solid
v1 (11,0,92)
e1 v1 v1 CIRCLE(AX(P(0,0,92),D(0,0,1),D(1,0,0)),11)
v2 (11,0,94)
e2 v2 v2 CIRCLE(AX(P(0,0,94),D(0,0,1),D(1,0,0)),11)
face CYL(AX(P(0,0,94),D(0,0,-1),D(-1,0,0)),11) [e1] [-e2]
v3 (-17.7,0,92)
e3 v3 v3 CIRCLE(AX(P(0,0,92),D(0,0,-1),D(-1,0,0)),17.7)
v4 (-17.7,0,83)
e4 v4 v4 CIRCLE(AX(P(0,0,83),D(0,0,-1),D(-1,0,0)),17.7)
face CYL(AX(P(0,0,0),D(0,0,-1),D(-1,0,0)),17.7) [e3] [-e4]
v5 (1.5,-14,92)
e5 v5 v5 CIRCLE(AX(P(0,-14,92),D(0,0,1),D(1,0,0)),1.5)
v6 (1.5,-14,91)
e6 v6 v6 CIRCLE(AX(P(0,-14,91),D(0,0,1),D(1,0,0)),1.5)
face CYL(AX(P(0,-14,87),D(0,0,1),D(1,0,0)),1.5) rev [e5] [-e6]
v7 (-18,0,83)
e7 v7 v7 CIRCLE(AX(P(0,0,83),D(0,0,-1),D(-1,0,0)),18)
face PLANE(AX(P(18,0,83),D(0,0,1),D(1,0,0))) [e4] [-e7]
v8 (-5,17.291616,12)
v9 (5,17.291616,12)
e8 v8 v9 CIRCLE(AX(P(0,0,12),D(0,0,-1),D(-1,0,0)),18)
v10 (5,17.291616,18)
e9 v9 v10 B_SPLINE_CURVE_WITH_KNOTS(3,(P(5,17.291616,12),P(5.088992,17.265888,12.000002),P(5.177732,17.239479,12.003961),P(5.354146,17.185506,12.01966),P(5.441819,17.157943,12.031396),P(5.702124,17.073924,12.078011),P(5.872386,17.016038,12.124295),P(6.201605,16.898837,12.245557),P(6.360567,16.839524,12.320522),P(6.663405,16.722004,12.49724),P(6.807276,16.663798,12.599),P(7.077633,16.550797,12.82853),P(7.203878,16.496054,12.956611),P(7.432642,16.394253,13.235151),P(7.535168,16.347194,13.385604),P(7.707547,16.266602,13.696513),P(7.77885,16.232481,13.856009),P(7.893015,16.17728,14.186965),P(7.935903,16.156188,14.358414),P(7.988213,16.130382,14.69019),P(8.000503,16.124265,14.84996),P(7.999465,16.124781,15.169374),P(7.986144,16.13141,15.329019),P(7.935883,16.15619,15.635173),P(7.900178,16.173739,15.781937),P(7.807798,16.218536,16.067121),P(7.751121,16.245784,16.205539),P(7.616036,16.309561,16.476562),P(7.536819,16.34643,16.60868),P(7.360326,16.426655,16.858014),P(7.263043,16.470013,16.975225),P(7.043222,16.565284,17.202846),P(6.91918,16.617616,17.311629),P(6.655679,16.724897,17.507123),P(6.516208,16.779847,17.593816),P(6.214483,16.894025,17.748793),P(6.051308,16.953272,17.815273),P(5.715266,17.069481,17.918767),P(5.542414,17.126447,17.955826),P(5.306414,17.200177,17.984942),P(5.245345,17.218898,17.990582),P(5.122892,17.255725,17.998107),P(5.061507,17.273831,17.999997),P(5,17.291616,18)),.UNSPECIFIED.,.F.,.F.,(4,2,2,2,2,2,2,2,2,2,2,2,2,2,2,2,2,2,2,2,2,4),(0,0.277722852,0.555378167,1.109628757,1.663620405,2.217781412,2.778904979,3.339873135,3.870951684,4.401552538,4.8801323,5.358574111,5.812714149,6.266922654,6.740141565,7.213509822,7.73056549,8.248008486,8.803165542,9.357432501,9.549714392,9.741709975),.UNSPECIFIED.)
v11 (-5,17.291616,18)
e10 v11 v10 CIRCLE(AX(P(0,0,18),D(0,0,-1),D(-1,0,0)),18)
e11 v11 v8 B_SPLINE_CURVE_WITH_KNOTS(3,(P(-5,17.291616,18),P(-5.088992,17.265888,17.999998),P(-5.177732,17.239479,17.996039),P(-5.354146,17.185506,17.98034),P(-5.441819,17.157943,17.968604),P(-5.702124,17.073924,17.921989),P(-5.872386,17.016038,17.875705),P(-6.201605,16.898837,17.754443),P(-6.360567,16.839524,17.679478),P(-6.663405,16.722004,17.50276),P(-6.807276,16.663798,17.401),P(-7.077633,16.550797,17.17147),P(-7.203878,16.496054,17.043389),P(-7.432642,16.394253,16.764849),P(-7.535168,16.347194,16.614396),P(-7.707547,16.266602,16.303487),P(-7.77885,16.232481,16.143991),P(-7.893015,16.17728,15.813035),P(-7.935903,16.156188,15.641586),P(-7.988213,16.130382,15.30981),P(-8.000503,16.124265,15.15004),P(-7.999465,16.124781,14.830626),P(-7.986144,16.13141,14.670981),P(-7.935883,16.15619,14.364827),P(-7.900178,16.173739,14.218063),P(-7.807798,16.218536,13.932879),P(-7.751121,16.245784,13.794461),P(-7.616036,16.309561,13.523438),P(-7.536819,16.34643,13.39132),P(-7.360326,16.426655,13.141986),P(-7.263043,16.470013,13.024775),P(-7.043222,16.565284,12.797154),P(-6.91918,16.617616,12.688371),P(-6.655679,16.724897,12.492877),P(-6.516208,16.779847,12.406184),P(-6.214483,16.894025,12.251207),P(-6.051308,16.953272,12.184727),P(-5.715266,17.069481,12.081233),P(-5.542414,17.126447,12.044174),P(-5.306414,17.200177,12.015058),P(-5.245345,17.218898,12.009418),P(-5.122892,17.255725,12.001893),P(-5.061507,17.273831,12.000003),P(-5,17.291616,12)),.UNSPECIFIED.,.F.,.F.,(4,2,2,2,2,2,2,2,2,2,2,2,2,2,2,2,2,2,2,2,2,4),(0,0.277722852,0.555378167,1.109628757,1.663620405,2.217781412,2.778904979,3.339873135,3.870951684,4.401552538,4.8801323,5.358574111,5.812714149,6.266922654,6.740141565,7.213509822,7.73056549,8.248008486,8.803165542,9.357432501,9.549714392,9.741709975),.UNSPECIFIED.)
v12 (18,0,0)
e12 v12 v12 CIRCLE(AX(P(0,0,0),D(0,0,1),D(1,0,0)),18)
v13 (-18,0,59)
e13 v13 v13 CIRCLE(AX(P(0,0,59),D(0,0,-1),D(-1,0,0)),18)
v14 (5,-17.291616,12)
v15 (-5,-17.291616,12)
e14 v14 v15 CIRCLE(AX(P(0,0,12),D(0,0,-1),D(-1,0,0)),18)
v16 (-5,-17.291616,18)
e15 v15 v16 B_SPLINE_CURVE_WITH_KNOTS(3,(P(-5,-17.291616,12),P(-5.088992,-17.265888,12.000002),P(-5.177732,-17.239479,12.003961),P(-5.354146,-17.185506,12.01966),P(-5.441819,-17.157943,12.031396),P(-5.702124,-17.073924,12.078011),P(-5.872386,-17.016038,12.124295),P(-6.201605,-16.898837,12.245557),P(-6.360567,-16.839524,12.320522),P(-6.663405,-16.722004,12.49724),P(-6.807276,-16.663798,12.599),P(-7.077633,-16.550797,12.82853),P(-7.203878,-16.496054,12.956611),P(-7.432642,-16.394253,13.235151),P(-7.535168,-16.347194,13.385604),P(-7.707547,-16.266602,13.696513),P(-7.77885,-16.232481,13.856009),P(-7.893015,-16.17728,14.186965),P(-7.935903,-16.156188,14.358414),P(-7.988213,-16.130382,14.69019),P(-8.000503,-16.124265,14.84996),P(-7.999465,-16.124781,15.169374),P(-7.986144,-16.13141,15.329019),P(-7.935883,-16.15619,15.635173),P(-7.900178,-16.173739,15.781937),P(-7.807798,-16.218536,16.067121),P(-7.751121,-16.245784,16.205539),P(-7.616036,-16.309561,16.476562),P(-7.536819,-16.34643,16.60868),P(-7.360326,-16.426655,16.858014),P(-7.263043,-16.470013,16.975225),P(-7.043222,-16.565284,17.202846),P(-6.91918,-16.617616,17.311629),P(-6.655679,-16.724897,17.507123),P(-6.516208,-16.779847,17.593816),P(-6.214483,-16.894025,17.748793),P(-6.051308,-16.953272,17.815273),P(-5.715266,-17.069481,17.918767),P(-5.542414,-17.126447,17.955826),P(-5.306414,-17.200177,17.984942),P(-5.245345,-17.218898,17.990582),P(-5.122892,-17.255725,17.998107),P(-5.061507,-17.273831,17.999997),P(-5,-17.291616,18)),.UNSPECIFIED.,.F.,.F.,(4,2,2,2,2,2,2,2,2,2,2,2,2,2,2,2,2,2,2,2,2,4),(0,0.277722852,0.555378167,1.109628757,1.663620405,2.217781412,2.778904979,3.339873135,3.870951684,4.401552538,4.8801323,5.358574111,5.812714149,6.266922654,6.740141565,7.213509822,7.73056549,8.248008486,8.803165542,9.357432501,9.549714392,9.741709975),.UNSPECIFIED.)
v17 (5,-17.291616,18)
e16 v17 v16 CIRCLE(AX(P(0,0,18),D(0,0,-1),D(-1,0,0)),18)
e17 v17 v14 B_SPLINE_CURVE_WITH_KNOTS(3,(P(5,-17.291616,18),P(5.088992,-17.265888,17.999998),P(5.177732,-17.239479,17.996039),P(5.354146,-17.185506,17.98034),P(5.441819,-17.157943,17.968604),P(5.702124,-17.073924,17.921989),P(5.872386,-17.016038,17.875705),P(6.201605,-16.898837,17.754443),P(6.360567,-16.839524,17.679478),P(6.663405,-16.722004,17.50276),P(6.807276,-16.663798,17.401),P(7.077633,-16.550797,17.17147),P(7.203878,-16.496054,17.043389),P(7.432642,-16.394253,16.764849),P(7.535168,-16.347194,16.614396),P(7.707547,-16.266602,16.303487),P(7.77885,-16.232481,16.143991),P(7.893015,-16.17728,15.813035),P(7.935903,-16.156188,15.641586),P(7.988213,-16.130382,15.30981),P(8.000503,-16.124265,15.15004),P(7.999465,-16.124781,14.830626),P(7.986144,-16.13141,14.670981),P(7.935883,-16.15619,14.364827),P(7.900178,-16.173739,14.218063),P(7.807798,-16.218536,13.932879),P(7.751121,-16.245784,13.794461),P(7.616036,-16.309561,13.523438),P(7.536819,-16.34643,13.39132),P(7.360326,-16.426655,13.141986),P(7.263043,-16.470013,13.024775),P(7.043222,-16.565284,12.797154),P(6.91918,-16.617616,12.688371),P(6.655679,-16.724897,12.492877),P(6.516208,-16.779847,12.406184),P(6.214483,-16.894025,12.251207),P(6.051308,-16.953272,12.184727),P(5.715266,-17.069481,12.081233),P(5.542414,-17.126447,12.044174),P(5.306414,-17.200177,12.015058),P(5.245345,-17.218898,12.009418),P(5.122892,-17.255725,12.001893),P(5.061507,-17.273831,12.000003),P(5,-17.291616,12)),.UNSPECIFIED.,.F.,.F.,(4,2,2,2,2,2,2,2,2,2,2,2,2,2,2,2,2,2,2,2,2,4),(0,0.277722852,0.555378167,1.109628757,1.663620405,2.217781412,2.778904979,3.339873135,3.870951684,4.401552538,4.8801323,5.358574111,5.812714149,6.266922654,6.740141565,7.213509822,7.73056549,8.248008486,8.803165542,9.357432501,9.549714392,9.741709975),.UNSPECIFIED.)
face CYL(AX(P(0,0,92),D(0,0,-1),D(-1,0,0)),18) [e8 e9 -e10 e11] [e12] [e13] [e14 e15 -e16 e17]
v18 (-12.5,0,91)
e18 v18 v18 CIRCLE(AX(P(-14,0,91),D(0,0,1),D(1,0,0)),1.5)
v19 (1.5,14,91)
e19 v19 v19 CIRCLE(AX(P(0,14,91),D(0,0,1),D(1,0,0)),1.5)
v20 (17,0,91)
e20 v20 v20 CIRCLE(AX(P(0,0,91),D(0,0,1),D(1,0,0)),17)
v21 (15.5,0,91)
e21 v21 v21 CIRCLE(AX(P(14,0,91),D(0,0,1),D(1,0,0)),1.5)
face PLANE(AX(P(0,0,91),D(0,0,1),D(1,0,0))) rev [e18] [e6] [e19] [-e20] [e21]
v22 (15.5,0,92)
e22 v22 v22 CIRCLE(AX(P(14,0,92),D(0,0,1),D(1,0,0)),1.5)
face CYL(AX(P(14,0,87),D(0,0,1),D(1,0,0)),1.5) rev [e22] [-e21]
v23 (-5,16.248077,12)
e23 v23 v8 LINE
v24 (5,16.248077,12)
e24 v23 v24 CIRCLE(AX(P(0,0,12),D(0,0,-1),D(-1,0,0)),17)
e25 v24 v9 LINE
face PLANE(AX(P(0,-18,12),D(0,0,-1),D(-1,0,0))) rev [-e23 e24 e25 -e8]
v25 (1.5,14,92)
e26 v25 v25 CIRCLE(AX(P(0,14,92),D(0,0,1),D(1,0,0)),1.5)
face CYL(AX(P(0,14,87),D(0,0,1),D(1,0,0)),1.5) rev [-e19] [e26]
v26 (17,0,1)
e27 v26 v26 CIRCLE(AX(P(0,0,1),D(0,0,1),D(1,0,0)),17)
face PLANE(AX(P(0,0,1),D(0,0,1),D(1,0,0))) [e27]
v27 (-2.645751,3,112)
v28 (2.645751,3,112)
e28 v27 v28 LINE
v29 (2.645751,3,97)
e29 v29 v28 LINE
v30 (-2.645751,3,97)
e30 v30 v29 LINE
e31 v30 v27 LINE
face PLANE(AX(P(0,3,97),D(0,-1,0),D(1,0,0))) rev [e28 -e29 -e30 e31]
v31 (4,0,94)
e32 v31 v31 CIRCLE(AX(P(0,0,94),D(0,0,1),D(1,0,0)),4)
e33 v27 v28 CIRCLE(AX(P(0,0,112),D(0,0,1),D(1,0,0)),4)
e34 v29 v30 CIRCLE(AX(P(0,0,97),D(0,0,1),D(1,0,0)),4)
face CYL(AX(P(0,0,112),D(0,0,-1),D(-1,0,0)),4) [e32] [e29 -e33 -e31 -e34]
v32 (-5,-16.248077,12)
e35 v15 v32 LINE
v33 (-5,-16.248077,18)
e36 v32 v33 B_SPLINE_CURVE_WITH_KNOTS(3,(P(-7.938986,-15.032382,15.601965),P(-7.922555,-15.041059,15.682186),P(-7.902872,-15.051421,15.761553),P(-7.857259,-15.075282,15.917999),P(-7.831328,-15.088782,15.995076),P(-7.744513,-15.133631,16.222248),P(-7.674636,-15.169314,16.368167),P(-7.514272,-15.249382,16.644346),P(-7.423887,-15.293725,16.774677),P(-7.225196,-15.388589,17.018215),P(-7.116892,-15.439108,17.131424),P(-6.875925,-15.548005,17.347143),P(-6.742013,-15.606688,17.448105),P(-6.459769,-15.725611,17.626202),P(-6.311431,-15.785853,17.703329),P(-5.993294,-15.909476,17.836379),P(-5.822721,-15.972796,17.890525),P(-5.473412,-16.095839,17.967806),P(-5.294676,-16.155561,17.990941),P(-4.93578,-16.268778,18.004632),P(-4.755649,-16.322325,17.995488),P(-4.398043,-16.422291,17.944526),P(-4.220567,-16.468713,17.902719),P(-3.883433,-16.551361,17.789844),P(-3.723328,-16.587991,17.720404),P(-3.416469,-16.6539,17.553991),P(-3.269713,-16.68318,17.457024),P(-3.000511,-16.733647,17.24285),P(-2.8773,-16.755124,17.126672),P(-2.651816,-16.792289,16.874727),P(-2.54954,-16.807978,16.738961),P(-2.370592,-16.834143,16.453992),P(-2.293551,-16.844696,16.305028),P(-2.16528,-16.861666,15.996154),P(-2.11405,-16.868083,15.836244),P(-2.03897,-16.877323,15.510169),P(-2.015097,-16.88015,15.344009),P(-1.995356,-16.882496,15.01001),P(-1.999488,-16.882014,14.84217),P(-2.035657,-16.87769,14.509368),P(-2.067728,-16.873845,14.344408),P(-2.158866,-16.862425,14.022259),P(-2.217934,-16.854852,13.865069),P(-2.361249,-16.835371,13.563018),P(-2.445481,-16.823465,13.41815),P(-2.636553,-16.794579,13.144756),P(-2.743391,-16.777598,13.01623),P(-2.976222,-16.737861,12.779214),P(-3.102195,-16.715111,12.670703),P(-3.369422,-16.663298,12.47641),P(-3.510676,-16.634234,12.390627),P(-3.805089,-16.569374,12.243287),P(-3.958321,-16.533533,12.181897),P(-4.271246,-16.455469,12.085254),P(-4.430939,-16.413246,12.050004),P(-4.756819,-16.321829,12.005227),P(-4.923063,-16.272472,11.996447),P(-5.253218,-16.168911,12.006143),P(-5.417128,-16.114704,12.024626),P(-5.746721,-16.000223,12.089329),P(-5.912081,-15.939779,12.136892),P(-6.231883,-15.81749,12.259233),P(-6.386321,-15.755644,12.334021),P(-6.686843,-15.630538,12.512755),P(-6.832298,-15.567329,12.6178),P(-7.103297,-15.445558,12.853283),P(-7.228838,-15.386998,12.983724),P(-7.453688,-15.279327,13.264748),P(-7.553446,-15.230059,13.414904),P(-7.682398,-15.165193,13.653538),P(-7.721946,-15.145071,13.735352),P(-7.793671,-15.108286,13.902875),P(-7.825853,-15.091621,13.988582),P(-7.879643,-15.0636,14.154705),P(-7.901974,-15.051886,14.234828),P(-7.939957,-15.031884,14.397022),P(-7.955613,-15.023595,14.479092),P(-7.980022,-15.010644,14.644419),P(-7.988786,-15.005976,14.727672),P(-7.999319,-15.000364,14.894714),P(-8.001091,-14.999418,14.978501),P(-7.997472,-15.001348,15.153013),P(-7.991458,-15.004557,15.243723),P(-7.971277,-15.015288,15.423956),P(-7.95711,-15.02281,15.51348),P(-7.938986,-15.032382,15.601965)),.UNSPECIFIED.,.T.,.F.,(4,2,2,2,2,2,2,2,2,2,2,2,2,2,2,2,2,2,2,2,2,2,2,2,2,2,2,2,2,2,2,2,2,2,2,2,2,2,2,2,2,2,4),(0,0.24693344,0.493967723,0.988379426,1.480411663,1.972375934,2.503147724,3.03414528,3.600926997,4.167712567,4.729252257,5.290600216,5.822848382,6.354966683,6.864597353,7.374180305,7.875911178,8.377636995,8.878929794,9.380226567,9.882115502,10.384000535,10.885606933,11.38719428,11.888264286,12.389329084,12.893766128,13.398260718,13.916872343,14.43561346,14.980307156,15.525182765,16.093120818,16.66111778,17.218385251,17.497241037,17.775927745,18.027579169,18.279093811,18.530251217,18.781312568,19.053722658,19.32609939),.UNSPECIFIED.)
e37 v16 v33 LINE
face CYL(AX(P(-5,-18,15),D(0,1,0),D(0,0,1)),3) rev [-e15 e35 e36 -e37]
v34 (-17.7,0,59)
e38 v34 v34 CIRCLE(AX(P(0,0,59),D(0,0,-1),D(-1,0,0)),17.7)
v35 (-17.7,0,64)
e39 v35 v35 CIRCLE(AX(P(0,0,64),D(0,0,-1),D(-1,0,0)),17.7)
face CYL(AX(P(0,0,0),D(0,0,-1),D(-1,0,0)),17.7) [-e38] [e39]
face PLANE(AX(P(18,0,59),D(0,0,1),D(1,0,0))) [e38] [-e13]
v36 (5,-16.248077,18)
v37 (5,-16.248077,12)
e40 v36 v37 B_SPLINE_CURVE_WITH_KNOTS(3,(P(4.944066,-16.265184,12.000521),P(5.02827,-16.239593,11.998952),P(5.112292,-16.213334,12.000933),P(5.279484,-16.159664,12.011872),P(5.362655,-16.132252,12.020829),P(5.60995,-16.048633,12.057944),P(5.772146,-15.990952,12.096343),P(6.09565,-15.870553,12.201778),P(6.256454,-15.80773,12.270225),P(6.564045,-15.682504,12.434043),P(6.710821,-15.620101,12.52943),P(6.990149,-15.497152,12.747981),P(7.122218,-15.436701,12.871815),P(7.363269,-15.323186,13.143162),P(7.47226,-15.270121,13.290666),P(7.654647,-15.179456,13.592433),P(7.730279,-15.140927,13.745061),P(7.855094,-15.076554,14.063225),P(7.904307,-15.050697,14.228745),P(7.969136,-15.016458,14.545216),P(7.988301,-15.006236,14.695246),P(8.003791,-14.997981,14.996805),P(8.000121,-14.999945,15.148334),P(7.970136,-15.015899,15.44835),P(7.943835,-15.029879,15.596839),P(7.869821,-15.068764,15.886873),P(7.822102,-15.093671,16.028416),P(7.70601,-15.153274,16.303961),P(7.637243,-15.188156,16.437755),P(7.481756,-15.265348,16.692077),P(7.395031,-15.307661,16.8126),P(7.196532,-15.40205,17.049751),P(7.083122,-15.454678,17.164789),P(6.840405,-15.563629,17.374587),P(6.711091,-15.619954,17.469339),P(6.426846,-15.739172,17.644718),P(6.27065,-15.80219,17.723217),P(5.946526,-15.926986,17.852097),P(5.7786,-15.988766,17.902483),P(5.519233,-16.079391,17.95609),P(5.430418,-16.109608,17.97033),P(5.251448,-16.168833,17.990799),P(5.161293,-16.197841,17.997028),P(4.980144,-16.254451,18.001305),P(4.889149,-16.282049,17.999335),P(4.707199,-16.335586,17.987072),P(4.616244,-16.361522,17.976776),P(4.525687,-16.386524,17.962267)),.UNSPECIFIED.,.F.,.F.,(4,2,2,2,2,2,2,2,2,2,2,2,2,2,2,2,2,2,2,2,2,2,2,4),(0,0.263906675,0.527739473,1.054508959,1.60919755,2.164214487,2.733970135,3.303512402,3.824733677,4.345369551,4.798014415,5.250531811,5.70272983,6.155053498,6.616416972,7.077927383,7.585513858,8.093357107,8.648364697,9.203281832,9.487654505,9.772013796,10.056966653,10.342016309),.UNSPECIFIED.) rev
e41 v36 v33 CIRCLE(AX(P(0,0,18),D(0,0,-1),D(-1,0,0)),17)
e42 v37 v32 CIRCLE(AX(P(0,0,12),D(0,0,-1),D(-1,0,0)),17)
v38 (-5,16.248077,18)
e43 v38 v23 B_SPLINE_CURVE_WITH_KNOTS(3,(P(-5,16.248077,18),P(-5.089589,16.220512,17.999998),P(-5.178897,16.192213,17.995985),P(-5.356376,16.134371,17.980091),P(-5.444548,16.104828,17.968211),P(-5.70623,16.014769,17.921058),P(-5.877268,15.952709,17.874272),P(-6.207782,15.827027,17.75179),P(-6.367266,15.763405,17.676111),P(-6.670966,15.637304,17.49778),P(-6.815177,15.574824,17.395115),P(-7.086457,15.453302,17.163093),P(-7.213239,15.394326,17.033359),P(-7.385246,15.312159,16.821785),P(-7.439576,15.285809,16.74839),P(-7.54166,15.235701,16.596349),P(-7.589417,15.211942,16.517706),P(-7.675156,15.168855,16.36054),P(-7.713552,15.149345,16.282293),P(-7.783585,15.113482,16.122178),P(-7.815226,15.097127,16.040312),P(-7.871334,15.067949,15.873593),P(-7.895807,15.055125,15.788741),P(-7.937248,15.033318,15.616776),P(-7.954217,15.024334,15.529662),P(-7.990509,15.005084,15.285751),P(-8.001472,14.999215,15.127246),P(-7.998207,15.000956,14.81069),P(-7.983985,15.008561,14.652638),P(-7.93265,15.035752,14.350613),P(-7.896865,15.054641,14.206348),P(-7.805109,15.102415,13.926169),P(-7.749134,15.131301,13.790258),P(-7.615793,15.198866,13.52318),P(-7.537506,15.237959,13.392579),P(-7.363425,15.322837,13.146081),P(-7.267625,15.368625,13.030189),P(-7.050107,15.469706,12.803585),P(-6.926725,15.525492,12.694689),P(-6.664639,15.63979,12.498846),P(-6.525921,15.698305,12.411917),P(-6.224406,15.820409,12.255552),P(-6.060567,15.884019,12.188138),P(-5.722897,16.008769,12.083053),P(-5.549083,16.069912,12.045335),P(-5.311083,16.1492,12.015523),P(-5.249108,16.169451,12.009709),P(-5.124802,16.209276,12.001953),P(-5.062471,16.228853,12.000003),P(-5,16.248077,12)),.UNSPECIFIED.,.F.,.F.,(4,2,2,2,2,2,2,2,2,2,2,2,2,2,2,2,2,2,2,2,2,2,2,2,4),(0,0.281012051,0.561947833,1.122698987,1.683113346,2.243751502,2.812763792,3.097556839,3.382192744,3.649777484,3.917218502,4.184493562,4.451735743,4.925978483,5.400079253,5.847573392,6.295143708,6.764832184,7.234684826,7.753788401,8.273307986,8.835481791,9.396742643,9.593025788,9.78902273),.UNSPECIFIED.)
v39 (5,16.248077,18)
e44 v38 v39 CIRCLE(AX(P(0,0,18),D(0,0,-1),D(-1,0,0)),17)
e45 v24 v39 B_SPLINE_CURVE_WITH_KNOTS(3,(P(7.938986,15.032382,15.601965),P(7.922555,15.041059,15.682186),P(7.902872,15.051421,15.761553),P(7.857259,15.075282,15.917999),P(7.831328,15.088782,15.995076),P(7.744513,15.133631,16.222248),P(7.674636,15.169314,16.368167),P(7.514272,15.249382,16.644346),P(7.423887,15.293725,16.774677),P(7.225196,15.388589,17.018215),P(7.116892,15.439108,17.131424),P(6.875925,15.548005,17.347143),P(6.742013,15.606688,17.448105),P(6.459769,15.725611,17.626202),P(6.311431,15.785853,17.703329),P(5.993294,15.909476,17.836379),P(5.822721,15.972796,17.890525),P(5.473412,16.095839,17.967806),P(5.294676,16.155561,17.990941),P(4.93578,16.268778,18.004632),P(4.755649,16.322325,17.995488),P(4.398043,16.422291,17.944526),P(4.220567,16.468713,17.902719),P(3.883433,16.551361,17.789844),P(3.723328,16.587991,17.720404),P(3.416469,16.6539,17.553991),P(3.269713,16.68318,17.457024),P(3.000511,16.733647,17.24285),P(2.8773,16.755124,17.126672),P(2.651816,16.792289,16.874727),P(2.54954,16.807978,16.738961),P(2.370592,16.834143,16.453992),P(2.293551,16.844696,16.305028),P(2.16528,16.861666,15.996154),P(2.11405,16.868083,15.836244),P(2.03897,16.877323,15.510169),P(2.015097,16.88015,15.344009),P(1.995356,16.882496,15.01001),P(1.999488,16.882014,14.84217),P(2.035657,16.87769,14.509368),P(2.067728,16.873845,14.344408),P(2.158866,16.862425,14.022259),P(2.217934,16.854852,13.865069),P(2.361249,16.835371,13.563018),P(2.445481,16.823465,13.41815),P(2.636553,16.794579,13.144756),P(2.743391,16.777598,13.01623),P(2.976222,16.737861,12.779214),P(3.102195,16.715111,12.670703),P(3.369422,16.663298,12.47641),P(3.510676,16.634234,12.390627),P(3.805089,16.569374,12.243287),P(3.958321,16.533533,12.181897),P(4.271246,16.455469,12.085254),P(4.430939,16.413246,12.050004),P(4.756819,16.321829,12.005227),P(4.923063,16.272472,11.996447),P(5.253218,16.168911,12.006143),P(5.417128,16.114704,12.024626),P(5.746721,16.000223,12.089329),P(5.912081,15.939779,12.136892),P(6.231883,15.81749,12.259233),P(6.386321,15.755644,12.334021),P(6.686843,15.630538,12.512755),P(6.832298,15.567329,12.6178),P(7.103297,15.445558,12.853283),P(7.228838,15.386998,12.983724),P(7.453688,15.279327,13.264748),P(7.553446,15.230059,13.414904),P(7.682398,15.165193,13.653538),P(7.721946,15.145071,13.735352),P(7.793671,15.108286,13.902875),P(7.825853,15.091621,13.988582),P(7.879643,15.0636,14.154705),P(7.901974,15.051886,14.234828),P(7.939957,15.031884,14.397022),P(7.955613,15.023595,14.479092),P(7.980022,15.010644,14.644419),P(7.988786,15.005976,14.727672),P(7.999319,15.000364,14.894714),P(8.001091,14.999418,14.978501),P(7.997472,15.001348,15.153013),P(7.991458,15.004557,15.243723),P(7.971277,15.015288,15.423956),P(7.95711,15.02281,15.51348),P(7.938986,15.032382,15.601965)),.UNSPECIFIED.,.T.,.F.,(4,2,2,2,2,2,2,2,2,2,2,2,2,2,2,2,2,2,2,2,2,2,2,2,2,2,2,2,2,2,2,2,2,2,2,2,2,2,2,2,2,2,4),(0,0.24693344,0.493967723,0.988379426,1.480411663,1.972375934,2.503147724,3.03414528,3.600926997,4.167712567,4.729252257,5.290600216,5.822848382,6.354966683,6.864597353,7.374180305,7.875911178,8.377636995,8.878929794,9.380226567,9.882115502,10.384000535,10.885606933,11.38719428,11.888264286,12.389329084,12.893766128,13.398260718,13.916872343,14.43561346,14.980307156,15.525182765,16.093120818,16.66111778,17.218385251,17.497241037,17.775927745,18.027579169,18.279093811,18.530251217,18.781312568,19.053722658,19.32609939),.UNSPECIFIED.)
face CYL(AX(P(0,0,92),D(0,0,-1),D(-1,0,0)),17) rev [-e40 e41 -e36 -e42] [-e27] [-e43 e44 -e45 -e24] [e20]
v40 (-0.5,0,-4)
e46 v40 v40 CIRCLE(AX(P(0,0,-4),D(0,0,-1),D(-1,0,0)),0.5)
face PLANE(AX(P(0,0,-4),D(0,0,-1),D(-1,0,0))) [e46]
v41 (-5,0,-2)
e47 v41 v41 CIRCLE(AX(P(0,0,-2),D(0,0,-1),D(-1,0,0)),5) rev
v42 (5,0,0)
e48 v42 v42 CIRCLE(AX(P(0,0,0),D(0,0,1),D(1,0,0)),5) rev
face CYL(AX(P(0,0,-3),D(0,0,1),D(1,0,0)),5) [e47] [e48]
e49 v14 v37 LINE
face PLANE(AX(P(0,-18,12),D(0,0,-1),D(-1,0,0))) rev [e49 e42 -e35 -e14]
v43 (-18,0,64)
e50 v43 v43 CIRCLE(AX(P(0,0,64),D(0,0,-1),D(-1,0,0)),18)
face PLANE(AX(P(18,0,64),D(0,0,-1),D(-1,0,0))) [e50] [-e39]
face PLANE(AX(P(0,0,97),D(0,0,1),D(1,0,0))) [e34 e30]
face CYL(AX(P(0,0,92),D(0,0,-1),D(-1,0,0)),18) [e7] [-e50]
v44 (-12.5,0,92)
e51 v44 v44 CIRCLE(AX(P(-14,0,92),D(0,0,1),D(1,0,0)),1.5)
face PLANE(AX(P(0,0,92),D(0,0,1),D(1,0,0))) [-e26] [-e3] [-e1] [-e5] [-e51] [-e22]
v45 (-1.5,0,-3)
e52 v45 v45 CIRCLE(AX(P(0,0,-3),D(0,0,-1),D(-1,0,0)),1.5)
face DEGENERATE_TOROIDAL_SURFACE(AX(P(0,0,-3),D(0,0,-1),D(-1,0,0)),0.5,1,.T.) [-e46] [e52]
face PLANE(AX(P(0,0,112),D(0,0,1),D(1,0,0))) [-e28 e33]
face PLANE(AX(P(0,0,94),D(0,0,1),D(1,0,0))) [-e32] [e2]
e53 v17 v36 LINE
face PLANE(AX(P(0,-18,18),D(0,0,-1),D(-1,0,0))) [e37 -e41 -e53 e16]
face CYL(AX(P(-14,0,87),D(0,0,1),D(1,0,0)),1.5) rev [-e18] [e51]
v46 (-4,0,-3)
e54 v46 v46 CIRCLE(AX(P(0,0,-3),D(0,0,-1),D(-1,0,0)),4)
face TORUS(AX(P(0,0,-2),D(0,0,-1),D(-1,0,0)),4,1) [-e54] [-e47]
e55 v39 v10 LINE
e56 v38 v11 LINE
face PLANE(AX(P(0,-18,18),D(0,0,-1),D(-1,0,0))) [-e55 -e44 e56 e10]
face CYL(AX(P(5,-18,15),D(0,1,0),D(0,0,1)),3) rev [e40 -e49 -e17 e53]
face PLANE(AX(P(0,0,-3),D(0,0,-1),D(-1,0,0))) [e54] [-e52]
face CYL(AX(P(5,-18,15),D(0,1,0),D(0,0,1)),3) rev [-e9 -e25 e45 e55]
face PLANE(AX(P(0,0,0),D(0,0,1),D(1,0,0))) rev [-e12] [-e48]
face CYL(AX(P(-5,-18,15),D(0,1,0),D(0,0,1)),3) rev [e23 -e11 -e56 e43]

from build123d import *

# Parameters (mm, degrees)
SKETCH_1_R          = 18
EXTRUDE_1_DEPTH     = 92
CUT_EXTRUDE_2_DEPTH = 36
SHELL_8_T           = -1
SKETCH_2_R          = 11
EXTRUDE_2_DEPTH     = 2
SKETCH_3_R          = 4
EXTRUDE_3_DEPTH     = 18
CUT_EXTRUDE_START   = -15
CUT_EXTRUDE_1_DEPTH = 15
SKETCH_5_R          = 5
EXTRUDE_4_DEPTH     = 3
SKETCH_6_R          = 1.5
EXTRUDE_5_DEPTH     = 1
FILLET_1_R          = 1
SKETCH_8_R          = 1.5
CUT_EXTRUDE_3_DEPTH = 5
SKETCH_9_W          = 0.3
SKETCH_9_H          = 9
SKETCH_9_H_2        = 5


with BuildPart() as part:
    # 草图1 → 凸台-拉伸1 (new body)
    with BuildSketch(Plane.XY):
        Circle(SKETCH_1_R)
    extrude(amount=EXTRUDE_1_DEPTH)

    # 草图7 → 切除-拉伸2 (cut)
    with BuildSketch(Plane(origin=(0, 18, 0), x_dir=(1, 0, 0), z_dir=(0, 1, 0))):
        with BuildLine():
            Line((5, -18), (-5, -18))
            ThreePointArc((-5, -18), (-8, -15), (-5, -12))
            Line((-5, -12), (5, -12))
            ThreePointArc((5, -12), (8, -15), (5, -18))
        make_face()
    extrude(amount=-CUT_EXTRUDE_2_DEPTH, mode=Mode.SUBTRACT)

    # 抽壳8
    shell_8_openings = [part.faces().sort_by_distance(p)[0] for p in [
        (8, 0, 15),
        (0, 0, 18),
        (-8, 0, 15),
        (0, 0, 12),
    ]]
    offset(amount=SHELL_8_T, openings=shell_8_openings)

    # 草图2 → 凸台-拉伸2 (add)
    with BuildSketch(Plane.XY.offset(92)):
        Circle(SKETCH_2_R)
    extrude(amount=EXTRUDE_2_DEPTH)

    # 草图3 → 凸台-拉伸3 (add)
    with BuildSketch(Plane.XY.offset(94)):
        Circle(SKETCH_3_R)
    extrude(amount=EXTRUDE_3_DEPTH)

    # 草图4 → 切除-拉伸1 (cut)
    with BuildSketch(Plane.XY.offset(112).offset(CUT_EXTRUDE_START)):
        with BuildLine():
            ThreePointArc((2.645751311, 3), (1.414213562, 3.741657387), (0, 4))
            Line((0, 4), (0, 3))
            Line((0, 3), (2.645751311, 3))
        make_face()
        with BuildLine():
            Line((0, 3), (0, 4))
            ThreePointArc((0, 4), (-1.414213562, 3.741657387), (-2.645751311, 3))
            Line((-2.645751311, 3), (0, 3))
        make_face()
    extrude(amount=CUT_EXTRUDE_1_DEPTH, mode=Mode.SUBTRACT)

    # 草图5 → 凸台-拉伸4 (add)
    with BuildSketch(Plane(origin=(0, 0, 0), x_dir=(-1, 0, 0), z_dir=(0, 0, -1))):
        with Locations(Location((0, 0, 0), (0, 0, 180))):
            Circle(SKETCH_5_R)
    extrude(amount=EXTRUDE_4_DEPTH)

    # 草图6 → 凸台-拉伸5 (add)
    with BuildSketch(Plane(origin=(0, 0, -3), x_dir=(-1, 0, 0), z_dir=(0, 0, -1))):
        Circle(SKETCH_6_R)
    extrude(amount=EXTRUDE_5_DEPTH)

    # 圆角1
    fillet_1_edges = [part.edges().sort_by_distance(p)[0] for p in [
        (-5, 0, -3),
        (1.5, 0, -4),
    ]]
    fillet(fillet_1_edges, radius=FILLET_1_R - 0.0001)  # a hair under: the kernel refuses the full size

    # 草图8 → 切除-拉伸3 (cut)
    with BuildSketch(Plane.XY.offset(92)):
        with Locations((14, 0)):
            Circle(SKETCH_8_R)
        with Locations((0, -14)):
            Circle(SKETCH_8_R)
        with Locations((-14, 0)):
            Circle(SKETCH_8_R)
        with Locations((0, 14)):
            Circle(SKETCH_8_R)
    extrude(amount=-CUT_EXTRUDE_3_DEPTH, mode=Mode.SUBTRACT)

    # 草图9 → 切除-旋转1 (revolve, cut)
    with BuildSketch(Plane(origin=(0, 0, 0), x_dir=(1, 0, 0), z_dir=(0, 1, 0)), mode=Mode.PRIVATE) as cut_revolve_1_sk:
        with Locations((17.85, -87.5)):
            Rectangle(SKETCH_9_W, SKETCH_9_H)
        with Locations((17.85, -61.5)):
            Rectangle(SKETCH_9_W, SKETCH_9_H_2)
    revolve(cut_revolve_1_sk.sketch.rotate(Axis((0, 0, 0), (0, 0, 1)), 180), axis=Axis((0, 0, 0), (0, 0, 1)), mode=Mode.SUBTRACT)


solid = part.part
